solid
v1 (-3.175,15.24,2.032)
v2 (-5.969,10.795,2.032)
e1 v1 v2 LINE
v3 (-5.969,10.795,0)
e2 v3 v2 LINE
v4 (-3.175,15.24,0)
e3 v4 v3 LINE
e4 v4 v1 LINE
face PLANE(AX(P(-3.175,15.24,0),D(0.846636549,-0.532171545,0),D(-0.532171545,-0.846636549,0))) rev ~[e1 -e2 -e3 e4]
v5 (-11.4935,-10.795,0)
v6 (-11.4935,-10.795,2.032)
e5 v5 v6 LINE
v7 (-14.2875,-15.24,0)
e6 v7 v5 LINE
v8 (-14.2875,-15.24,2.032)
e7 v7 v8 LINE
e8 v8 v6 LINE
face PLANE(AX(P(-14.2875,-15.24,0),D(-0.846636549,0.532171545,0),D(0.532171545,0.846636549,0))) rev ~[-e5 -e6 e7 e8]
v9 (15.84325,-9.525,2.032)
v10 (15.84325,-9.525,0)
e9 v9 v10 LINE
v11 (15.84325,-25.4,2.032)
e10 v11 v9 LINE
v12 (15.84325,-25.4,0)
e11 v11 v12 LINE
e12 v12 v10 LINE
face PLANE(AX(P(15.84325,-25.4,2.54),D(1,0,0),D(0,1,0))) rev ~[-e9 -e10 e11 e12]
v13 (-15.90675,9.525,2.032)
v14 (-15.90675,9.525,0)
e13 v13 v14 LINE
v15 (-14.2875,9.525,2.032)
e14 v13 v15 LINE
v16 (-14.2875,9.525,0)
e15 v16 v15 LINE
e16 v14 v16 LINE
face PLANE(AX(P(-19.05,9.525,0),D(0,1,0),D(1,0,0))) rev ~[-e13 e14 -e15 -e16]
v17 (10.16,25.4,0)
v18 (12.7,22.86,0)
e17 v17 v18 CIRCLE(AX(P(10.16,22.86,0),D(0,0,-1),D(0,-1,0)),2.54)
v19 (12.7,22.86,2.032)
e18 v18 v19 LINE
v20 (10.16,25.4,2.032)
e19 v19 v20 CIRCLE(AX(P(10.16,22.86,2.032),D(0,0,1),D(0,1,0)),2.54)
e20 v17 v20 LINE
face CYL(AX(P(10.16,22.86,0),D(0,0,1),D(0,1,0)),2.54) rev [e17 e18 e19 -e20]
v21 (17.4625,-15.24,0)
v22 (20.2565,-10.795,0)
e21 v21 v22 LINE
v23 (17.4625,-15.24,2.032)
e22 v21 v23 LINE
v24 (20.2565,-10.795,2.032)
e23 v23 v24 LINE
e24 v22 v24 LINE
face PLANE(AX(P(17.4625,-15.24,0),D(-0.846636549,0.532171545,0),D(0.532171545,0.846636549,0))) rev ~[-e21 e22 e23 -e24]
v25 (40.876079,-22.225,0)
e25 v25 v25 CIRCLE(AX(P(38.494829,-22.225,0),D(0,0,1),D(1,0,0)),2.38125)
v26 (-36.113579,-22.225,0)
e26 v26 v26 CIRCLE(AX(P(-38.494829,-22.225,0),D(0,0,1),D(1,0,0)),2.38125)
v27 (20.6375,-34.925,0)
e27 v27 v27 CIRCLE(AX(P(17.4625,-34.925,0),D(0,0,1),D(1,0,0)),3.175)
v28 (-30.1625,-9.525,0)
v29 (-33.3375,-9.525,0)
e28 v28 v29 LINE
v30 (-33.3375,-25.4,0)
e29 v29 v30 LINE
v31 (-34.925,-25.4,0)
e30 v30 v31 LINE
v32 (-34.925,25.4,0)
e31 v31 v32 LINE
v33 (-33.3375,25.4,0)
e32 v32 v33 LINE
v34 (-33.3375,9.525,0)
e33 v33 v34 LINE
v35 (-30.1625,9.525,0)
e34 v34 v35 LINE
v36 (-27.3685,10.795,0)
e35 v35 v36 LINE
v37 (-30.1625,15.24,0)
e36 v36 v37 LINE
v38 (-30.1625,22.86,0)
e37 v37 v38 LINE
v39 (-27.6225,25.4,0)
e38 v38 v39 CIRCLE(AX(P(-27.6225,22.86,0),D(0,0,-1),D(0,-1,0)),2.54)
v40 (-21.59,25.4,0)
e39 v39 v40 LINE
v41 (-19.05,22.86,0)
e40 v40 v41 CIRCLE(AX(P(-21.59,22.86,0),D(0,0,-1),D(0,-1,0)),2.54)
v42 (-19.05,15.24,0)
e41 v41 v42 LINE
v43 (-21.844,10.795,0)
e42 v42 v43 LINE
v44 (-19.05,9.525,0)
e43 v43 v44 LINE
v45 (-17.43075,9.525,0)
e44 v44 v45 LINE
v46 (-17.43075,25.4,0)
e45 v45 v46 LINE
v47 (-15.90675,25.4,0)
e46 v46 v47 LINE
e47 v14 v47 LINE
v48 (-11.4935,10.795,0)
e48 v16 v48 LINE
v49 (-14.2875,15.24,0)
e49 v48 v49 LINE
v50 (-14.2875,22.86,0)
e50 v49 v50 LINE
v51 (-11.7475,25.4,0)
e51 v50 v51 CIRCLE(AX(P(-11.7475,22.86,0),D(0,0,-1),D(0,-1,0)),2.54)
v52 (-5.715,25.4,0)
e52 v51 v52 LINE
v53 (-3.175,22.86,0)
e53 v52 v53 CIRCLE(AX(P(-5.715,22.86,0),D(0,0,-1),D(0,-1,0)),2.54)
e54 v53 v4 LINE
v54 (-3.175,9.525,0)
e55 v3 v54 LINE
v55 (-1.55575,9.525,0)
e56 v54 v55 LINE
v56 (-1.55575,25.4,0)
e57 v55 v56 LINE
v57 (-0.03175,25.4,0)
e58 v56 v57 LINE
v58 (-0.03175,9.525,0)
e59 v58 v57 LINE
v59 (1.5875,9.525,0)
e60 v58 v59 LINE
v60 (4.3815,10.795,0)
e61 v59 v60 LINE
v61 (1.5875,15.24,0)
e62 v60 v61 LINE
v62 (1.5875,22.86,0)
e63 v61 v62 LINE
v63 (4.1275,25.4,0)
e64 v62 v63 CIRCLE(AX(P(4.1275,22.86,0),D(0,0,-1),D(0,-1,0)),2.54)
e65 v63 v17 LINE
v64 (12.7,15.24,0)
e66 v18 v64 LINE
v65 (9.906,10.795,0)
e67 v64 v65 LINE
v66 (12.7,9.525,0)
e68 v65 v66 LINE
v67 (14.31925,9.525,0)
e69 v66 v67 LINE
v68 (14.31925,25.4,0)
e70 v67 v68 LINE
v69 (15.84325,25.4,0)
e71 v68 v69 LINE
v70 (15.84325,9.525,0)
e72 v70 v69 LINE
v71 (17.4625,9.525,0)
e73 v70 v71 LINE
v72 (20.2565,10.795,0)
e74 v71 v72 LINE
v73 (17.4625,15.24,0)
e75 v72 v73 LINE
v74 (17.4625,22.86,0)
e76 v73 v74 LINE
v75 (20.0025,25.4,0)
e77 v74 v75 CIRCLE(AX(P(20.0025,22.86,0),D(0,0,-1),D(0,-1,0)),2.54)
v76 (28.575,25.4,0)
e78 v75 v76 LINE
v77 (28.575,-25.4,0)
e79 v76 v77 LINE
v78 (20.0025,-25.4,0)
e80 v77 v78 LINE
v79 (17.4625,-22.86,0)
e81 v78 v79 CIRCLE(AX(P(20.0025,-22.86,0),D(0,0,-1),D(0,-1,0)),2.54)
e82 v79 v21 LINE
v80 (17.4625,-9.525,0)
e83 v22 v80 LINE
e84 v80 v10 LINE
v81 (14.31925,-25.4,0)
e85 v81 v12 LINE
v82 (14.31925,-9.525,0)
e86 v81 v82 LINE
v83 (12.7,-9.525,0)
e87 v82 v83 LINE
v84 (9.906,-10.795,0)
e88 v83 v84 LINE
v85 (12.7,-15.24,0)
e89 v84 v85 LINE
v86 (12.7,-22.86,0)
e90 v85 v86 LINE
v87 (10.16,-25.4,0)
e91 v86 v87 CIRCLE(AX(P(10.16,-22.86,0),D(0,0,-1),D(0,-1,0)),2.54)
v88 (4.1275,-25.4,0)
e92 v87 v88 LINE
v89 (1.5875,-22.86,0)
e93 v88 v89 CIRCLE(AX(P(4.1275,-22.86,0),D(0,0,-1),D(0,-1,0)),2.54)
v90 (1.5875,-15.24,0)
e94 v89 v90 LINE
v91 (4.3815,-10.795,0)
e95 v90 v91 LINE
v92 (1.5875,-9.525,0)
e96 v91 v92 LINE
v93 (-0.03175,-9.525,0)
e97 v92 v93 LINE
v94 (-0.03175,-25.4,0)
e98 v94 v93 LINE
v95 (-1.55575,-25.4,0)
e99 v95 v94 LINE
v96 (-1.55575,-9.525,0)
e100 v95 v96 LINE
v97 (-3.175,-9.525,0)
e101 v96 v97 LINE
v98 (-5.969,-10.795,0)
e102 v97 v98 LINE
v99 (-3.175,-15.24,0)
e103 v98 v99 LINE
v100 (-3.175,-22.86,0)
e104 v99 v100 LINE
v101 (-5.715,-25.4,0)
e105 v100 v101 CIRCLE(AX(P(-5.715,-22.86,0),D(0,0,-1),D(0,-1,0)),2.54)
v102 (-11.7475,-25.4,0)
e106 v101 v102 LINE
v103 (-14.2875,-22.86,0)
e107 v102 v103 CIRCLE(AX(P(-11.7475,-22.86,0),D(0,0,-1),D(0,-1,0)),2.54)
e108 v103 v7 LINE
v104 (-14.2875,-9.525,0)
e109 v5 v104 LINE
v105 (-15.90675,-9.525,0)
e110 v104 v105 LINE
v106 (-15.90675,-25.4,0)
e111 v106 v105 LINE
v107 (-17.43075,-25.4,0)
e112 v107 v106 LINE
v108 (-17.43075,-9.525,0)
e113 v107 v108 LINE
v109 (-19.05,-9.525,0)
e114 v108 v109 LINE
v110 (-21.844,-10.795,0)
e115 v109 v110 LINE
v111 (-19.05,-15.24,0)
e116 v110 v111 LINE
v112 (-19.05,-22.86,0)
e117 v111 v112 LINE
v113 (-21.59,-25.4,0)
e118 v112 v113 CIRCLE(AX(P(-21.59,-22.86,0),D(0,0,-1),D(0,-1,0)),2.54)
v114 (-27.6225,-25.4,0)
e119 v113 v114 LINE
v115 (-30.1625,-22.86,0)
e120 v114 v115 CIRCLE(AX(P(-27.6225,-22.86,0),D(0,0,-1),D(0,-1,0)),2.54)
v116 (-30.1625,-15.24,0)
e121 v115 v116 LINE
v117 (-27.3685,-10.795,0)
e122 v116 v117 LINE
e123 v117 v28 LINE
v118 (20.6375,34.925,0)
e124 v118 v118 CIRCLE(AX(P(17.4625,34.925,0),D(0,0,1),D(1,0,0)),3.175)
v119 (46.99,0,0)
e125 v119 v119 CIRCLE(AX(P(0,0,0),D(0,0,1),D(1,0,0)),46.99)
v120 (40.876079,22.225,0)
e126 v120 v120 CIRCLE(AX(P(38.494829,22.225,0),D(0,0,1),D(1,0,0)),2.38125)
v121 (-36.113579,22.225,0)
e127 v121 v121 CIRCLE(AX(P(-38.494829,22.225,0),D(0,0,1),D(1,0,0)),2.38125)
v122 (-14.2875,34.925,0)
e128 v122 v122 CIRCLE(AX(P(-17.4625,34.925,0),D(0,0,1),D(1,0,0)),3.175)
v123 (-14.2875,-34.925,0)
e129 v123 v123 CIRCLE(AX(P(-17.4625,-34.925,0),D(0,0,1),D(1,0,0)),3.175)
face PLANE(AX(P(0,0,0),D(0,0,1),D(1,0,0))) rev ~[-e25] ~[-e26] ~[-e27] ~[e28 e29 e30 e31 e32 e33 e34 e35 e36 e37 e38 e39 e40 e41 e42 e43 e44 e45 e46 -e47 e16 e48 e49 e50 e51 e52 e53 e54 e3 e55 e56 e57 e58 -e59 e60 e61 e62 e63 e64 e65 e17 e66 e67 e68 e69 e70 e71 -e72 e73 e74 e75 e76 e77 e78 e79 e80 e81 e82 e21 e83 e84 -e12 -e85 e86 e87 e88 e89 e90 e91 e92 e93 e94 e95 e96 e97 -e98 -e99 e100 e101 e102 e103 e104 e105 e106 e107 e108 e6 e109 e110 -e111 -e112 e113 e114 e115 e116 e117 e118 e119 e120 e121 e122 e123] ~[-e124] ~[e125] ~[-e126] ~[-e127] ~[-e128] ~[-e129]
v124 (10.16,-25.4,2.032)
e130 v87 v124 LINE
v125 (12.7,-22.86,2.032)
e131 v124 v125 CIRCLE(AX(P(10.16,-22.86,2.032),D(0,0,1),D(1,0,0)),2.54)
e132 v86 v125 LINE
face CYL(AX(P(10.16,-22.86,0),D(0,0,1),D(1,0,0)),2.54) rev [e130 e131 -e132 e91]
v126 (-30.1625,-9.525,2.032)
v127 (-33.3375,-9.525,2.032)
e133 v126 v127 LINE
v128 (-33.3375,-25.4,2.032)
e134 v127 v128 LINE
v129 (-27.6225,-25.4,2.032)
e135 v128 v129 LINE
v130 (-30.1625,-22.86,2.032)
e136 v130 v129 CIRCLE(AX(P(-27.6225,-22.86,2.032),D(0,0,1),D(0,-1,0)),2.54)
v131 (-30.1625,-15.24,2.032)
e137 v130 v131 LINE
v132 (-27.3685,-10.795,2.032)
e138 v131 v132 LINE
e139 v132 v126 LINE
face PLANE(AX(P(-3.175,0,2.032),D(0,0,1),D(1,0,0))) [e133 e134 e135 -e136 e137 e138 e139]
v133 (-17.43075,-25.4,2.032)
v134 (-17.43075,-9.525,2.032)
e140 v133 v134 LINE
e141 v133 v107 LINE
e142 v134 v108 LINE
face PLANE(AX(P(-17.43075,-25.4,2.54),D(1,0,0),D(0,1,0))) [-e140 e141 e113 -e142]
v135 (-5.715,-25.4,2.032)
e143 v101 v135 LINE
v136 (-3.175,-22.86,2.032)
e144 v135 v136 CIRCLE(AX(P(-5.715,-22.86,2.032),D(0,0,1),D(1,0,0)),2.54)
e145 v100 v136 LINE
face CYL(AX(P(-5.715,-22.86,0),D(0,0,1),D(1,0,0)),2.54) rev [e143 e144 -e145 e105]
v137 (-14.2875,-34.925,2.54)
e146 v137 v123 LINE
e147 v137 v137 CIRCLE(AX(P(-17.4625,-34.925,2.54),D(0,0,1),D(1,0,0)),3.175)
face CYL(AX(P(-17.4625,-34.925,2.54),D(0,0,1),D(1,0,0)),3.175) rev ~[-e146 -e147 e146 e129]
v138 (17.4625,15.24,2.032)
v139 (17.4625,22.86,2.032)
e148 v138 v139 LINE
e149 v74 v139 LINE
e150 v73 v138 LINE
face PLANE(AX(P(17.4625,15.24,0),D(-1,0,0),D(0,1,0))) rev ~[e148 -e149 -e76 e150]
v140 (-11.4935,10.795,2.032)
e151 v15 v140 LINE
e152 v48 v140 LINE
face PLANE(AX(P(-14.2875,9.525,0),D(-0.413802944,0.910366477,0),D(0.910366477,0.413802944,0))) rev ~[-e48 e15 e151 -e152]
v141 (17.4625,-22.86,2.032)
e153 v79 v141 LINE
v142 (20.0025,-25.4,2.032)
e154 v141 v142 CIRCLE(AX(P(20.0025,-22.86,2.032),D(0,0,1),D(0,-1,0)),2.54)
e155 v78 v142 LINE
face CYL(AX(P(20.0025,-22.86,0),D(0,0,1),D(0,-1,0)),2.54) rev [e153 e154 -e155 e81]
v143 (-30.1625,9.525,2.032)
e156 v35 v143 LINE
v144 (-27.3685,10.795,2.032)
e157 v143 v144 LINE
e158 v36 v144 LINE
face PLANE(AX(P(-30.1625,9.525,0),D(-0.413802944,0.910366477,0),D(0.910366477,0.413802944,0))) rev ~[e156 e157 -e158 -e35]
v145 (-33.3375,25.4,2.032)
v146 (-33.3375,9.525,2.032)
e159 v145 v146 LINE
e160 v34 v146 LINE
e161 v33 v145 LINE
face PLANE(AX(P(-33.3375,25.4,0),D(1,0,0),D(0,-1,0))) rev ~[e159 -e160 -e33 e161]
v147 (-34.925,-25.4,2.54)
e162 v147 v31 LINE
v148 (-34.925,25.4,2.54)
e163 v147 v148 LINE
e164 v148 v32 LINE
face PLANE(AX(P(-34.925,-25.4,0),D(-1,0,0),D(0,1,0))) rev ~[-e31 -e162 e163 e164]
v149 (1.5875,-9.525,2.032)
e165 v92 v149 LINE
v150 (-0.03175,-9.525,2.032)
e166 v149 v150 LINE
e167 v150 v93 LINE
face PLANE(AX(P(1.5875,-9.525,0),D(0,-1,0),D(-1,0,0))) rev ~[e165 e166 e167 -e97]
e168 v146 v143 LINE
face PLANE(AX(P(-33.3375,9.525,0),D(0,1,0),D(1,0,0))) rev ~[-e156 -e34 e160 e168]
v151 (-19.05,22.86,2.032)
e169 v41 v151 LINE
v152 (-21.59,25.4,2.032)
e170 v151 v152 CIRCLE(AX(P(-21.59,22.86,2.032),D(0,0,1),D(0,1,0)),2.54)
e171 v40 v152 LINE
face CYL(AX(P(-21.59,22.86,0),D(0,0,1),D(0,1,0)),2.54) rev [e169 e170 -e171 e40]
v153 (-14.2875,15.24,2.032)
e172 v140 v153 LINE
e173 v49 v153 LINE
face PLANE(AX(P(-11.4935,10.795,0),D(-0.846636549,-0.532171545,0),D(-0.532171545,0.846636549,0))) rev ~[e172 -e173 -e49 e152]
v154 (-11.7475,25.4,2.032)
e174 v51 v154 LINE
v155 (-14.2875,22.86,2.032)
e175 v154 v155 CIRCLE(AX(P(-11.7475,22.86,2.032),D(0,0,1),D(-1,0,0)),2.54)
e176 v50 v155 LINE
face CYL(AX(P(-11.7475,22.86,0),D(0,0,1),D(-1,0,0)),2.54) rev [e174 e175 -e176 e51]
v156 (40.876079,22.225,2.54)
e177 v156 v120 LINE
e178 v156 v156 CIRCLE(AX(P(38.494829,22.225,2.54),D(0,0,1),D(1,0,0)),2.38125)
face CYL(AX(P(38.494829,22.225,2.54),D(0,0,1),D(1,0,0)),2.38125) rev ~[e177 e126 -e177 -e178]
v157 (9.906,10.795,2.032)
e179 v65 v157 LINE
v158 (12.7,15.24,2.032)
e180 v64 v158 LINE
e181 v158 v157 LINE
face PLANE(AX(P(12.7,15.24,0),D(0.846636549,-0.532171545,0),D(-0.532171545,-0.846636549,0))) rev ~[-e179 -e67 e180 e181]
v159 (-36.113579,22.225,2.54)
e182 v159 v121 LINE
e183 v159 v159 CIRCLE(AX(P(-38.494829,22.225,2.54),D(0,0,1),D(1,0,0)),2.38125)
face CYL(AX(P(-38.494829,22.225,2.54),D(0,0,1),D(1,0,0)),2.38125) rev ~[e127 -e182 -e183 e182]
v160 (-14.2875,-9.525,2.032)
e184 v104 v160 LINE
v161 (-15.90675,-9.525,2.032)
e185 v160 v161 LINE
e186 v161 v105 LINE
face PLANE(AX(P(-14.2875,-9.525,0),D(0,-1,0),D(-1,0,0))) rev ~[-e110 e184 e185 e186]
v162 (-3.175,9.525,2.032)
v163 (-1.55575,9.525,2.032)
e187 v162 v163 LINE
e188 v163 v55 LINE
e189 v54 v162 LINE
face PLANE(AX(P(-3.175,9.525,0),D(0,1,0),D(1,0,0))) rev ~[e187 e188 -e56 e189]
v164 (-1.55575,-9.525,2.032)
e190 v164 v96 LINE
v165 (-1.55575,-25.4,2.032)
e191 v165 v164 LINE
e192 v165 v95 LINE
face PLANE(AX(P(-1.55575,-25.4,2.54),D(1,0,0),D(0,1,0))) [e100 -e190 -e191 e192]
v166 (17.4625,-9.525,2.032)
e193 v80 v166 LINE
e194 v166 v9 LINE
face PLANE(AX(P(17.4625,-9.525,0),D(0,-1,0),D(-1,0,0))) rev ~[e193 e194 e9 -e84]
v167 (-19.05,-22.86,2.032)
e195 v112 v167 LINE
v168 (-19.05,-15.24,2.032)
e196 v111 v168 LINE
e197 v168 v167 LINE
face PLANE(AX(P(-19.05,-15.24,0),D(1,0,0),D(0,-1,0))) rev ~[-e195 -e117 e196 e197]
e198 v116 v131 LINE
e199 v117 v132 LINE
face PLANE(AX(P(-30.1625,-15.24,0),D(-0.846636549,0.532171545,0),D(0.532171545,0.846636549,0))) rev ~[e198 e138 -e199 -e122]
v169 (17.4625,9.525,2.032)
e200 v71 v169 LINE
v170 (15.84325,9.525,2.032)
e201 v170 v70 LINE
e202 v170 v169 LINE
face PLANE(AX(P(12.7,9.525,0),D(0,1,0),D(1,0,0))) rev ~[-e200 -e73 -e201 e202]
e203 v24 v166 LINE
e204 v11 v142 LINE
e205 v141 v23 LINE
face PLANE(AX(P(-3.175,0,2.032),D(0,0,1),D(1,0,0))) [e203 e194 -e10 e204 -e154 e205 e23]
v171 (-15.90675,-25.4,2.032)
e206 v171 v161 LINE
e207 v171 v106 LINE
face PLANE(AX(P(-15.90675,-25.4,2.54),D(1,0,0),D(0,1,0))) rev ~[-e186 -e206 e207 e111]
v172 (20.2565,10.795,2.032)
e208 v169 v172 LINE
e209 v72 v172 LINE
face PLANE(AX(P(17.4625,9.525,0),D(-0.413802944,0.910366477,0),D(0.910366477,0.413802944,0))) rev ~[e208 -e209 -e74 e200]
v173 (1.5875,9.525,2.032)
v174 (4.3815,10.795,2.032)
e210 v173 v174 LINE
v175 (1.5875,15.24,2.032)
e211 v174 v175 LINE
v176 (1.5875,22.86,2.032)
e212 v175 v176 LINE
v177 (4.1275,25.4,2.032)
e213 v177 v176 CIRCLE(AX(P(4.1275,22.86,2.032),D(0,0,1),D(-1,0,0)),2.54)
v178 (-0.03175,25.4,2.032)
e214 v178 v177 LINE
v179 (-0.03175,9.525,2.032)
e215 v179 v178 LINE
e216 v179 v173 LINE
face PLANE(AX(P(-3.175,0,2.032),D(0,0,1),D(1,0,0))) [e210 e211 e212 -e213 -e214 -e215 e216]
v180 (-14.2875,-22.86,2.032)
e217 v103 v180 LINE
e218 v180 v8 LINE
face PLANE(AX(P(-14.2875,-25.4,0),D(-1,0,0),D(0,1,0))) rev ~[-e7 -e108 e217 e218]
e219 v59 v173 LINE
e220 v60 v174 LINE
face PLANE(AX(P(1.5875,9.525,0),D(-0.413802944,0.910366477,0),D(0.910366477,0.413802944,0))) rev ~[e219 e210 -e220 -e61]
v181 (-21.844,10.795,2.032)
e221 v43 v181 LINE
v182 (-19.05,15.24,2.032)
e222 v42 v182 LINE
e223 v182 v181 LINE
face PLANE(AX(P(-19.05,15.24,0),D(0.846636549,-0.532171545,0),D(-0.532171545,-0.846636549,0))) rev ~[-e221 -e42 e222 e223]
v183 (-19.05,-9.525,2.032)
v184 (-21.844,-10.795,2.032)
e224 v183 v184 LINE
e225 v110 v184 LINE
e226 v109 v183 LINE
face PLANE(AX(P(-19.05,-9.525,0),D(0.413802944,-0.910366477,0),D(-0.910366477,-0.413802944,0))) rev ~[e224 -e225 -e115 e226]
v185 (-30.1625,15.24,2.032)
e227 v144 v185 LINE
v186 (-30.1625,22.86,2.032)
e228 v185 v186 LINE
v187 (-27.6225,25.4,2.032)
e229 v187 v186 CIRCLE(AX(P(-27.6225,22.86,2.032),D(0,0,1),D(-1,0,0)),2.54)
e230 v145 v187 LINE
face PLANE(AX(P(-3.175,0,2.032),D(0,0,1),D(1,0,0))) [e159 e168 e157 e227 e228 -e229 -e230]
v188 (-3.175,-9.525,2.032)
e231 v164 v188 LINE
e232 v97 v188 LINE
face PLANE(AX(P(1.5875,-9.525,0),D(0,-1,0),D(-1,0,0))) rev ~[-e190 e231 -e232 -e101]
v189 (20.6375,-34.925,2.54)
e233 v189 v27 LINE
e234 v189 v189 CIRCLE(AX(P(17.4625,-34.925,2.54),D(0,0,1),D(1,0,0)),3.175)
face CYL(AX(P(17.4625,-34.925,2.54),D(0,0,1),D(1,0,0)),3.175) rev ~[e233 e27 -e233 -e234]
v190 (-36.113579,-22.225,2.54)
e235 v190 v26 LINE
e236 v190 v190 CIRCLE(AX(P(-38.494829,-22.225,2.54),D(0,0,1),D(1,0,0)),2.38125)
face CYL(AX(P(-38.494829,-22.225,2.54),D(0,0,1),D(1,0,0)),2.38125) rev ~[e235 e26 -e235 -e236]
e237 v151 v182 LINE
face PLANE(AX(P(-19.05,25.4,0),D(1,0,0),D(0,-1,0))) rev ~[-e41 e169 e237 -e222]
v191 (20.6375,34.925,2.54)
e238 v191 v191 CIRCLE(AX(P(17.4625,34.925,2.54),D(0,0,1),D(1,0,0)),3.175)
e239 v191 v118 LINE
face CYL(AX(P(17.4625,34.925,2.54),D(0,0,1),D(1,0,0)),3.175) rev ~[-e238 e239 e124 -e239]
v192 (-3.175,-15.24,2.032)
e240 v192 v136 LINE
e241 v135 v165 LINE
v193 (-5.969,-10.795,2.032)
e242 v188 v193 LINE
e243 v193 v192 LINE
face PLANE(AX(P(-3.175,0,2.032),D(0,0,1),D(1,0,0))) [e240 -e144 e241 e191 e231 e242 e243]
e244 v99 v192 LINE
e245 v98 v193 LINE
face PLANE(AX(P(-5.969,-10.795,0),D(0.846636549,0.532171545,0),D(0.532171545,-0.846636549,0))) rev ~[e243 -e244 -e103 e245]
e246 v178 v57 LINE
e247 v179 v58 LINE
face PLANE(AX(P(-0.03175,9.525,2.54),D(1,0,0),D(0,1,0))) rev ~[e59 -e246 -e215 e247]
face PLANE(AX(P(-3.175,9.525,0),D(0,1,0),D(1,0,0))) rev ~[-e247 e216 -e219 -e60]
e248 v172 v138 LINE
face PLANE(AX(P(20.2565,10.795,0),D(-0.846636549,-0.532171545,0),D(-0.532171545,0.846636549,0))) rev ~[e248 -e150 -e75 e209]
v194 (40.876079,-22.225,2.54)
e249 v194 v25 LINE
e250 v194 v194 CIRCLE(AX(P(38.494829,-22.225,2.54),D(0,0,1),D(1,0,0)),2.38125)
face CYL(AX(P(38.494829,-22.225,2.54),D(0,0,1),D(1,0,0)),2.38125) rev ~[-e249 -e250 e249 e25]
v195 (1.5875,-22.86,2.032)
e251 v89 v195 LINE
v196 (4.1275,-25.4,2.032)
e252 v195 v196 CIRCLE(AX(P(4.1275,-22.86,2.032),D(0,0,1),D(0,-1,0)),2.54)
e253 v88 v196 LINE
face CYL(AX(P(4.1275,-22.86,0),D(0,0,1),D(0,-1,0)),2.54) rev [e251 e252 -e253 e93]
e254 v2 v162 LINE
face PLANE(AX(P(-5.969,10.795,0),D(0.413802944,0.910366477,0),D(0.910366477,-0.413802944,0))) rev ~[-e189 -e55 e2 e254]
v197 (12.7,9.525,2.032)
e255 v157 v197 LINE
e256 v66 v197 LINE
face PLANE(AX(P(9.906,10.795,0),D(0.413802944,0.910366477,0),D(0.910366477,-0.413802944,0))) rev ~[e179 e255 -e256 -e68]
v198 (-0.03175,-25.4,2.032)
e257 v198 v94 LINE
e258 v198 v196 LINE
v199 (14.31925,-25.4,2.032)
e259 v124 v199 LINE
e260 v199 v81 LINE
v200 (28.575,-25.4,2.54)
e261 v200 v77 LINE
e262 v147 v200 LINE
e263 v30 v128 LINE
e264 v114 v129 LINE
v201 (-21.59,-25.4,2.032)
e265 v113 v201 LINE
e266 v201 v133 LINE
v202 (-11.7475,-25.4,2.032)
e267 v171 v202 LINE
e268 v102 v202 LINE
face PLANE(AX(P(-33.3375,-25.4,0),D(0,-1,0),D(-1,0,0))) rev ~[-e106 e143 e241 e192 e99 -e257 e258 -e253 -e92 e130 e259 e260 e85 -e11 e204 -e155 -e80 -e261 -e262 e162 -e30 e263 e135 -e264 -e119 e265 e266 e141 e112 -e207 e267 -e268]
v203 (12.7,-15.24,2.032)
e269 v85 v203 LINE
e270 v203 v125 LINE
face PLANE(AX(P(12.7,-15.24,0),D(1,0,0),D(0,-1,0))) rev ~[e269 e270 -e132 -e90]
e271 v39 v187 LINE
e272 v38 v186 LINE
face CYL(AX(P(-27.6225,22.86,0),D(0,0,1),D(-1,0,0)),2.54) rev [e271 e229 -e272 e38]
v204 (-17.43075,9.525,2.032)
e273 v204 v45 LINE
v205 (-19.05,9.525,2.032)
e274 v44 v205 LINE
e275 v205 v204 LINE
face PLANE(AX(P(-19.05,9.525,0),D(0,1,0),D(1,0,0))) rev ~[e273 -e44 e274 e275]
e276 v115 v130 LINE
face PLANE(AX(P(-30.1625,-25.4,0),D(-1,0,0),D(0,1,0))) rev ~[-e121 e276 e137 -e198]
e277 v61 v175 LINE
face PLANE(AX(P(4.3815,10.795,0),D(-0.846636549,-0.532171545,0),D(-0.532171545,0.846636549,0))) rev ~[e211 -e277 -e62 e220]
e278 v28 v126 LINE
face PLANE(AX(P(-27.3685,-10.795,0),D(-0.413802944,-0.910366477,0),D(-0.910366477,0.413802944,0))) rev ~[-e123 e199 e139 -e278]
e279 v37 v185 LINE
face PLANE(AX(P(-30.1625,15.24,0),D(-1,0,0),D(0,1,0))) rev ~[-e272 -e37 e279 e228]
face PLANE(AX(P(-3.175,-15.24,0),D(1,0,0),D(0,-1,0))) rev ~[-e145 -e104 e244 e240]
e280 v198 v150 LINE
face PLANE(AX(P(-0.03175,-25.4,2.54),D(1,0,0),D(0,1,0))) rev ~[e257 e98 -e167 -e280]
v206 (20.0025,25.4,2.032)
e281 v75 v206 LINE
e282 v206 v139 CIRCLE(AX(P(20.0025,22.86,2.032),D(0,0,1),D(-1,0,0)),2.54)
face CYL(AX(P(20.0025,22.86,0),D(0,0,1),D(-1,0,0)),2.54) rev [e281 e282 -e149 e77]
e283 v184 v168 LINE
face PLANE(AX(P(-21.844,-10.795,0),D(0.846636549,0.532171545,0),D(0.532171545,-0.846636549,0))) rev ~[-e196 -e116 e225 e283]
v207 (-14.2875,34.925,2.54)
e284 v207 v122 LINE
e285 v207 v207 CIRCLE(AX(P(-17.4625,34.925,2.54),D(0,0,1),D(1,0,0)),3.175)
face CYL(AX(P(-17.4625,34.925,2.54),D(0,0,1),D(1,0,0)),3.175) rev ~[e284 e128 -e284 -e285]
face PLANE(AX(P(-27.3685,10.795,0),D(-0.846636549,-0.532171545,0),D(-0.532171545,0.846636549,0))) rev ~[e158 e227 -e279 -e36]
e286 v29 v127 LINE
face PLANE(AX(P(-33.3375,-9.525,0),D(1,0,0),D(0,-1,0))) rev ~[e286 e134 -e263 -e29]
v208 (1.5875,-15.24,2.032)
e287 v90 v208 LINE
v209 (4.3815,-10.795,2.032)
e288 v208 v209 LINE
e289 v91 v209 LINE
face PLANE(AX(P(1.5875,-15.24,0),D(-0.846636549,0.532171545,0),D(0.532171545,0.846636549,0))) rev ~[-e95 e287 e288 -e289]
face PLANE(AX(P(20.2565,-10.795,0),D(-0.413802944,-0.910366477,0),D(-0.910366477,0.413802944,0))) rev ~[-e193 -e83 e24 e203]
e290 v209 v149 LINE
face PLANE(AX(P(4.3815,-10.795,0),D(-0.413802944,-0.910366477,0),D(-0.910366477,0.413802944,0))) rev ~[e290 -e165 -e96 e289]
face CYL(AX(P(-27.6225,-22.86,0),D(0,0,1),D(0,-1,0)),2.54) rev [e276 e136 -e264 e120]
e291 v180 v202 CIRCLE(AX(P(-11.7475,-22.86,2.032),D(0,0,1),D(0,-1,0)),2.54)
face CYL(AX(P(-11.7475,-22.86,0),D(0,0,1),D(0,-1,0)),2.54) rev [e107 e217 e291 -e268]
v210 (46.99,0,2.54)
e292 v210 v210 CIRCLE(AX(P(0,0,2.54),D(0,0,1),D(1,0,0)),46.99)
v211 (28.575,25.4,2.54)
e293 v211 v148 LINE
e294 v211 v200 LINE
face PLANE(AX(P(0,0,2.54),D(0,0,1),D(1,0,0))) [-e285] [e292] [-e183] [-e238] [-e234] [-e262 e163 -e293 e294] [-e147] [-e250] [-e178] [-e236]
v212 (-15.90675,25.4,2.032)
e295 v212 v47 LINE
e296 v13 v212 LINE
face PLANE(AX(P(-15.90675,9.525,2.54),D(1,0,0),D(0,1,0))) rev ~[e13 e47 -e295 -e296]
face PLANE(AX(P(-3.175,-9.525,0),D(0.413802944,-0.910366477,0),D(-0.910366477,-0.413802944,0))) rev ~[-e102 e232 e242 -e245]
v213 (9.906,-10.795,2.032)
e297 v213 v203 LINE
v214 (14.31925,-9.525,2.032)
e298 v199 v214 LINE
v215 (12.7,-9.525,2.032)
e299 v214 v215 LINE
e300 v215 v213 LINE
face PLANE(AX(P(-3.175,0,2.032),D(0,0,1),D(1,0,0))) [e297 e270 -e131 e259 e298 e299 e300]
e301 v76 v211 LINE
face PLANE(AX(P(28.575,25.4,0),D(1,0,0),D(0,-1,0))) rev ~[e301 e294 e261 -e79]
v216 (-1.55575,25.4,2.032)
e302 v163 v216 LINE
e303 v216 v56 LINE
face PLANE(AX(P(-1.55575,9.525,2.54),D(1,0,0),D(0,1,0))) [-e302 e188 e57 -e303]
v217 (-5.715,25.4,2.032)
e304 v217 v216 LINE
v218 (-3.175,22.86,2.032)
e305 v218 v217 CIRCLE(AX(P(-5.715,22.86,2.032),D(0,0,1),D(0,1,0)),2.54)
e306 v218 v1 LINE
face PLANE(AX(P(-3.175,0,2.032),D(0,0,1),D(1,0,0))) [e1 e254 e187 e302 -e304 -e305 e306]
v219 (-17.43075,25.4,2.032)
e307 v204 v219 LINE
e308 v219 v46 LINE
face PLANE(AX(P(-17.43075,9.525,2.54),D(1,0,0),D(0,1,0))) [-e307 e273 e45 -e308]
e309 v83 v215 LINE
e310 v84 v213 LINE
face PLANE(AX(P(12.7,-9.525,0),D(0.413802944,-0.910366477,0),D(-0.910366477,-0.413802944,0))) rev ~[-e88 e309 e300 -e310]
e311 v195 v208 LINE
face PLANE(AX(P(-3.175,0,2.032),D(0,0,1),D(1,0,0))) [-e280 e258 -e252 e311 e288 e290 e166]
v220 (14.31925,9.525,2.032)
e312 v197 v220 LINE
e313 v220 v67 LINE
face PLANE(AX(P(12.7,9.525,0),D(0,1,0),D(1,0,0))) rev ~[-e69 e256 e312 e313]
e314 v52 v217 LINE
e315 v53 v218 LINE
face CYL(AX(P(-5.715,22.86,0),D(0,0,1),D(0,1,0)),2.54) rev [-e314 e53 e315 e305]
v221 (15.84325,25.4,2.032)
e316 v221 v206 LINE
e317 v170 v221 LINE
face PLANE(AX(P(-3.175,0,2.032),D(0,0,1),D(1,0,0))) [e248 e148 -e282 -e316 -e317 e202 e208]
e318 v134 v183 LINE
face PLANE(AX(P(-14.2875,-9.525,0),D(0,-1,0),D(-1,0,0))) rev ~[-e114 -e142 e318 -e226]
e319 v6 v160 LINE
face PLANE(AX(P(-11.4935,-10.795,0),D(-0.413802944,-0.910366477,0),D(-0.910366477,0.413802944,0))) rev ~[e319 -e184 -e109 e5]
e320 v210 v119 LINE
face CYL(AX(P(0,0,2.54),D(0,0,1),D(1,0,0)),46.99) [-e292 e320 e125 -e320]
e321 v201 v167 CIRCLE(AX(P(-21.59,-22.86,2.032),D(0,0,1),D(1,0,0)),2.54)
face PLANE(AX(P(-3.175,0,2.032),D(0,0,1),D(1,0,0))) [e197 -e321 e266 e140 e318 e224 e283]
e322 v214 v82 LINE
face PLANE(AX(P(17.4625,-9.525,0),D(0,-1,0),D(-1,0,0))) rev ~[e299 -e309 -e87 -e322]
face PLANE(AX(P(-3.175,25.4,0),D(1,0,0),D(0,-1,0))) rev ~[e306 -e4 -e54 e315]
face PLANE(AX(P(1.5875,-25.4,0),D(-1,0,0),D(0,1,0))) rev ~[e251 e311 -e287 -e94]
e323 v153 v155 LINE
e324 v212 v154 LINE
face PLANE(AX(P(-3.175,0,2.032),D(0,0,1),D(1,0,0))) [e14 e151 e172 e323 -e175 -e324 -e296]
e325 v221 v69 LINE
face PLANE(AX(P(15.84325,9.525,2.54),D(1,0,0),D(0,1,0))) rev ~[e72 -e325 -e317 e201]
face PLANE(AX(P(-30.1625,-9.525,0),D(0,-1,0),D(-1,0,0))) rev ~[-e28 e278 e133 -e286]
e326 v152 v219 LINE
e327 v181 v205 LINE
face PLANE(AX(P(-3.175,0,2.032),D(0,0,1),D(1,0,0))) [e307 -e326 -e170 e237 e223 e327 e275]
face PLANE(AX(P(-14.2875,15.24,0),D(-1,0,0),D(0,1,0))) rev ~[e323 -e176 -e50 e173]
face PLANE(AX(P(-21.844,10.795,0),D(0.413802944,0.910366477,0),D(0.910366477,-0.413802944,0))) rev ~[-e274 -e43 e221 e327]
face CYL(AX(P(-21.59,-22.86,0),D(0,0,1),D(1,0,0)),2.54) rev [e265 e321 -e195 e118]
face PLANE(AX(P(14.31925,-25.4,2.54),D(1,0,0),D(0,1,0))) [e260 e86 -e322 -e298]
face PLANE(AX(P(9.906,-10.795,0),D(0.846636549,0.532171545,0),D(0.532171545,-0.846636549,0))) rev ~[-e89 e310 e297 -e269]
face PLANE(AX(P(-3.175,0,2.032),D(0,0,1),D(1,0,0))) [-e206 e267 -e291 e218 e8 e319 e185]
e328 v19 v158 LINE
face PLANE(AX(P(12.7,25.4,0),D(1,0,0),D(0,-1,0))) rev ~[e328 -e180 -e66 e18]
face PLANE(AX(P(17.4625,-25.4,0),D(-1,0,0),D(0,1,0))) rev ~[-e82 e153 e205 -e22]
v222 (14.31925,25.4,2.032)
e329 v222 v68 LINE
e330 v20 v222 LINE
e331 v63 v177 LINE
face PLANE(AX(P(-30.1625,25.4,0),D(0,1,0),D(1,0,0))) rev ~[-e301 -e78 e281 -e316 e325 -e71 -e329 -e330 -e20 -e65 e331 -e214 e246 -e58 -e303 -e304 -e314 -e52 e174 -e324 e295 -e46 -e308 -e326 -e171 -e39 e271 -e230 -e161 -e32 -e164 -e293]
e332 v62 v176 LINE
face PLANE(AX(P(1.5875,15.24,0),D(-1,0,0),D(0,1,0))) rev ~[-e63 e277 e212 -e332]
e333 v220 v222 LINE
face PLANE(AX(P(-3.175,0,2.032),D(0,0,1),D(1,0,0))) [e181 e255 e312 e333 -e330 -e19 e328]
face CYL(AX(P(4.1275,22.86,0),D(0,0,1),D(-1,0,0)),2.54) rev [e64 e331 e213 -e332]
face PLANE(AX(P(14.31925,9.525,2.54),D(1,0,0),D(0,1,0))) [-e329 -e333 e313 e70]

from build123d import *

# Parameters (mm, degrees)
F0_R     = 52.3875
F1_DEPTH = 2.54
F2_R     = 2.54
F3_W     = 63.5
F3_H     = 50.8
F4_DEPTH = 0.508
F5_R     = 52.3875
F5_R_2   = 46.99
F5_R_3   = 2.38125
F5_R_4   = 3.175
F6_DEPTH = 25.4
F7_W     = 1.524
F7_H     = 15.875
F8_DEPTH = 25.4


# Not quite as in the source:
# - a feature names something its author has since deleted; it is built from what else it names


with BuildPart() as f1:
    # F0 (on Top) → F1 (new body)
    with BuildSketch(Plane.XY):
        Circle(F0_R)
        Polygon((-34.925, 25.4), (-33.3375, 25.4), (-30.1625, 25.4), (-19.05, 25.4), (-19.05, 15.24), (-21.844, 10.795), (-19.05, 9.525), (-17.4625, 9.525), (-14.2875, 9.525), (-11.4935, 10.795), (-14.2875, 15.24), (-14.2875, 25.4), (-3.175, 25.4), (-3.175, 15.24), (-5.969, 10.795), (-3.175, 9.525), (-1.5875, 9.525), (1.5875, 9.525), (4.3815, 10.795), (1.5875, 15.24), (1.5875, 25.4), (12.7, 25.4), (12.7, 15.24), (9.906, 10.795), (12.7, 9.525), (14.2875, 9.525), (17.4625, 9.525), (20.2565, 10.795), (17.4625, 15.24), (17.4625, 25.4), (28.575, 25.4), (28.575, -25.4), (17.4625, -25.4), (17.4625, -15.24), (20.2565, -10.795), (17.4625, -9.525), (14.2875, -9.525), (12.7, -9.525), (9.906, -10.795), (12.7, -15.24), (12.7, -25.4), (1.5875, -25.4), (1.5875, -15.24), (4.3815, -10.795), (1.5875, -9.525), (-1.5875, -9.525), (-3.175, -9.525), (-5.969, -10.795), (-3.175, -15.24), (-3.175, -25.4), (-14.2875, -25.4), (-14.2875, -15.24), (-11.4935, -10.795), (-14.2875, -9.525), (-17.4625, -9.525), (-19.05, -9.525), (-21.844, -10.795), (-19.05, -15.24), (-19.05, -25.4), (-30.1625, -25.4), (-33.3375, -25.4), (-34.925, -25.4), align=None, mode=Mode.SUBTRACT)
        Polygon((-33.3375, 9.525), (-30.1625, 9.525), (-27.3685, 10.795), (-30.1625, 15.24), (-30.1625, 25.4), (-33.3375, 25.4), align=None)
        Polygon((-33.3375, -9.525), (-33.3375, -25.4), (-30.1625, -25.4), (-30.1625, -15.24), (-27.3685, -10.795), (-30.1625, -9.525), align=None)
    extrude(amount=F1_DEPTH)

    # F2
    f2_edges = [f1.edges().sort_by_distance(p)[0] for p in [
        (-30.1625, 25.4, 1.27),
        (-14.2875, 25.4, 1.27),
        (1.5875, 25.4, 1.27),
        (17.4625, 25.4, 1.27),
        (17.4625, -25.4, 1.27),
        (1.5875, -25.4, 1.27),
        (-14.2875, -25.4, 1.27),
        (-30.1625, -25.4, 1.27),
        (-19.05, -25.4, 1.27),
        (-3.175, -25.4, 1.27),
        (12.7, -25.4, 1.27),
        (12.7, 25.4, 1.27),
        (-3.175, 25.4, 1.27),
        (-19.05, 25.4, 1.27),
    ]]
    fillet(f2_edges, radius=F2_R)

    # F3 (on face) → F4 (cut)
    with BuildSketch(Plane.XY.offset(2.54)):
        with Locations((-3.175, 0)):
            Rectangle(F3_W, F3_H)
    extrude(amount=-F4_DEPTH, mode=Mode.SUBTRACT)

    # F5 (on face) → F6 (cut)
    with BuildSketch(Plane.XY.offset(2.54)):
        Circle(F5_R)
        Circle(F5_R_2, mode=Mode.SUBTRACT)
        with Locations((-38.4948291982, 22.225)):
            Circle(F5_R_3)
        with Locations((-38.4948291982, -22.225)):
            Circle(F5_R_3)
        with Locations((38.4948291982, -22.225)):
            Circle(F5_R_3)
        with Locations((38.4948291982, 22.225)):
            Circle(F5_R_3)
        with Locations((17.4625, -34.925)):
            Circle(F5_R_4)
        with Locations((17.4625, 34.925)):
            Circle(F5_R_4)
        with Locations((-17.4625, 34.925)):
            Circle(F5_R_4)
        with Locations((-17.4625, -34.925)):
            Circle(F5_R_4)
    extrude(amount=-F6_DEPTH, mode=Mode.SUBTRACT)

    # F7 (on face) → F8 (cut)
    with BuildSketch(Plane.XY.offset(2.54)):
        with Locations((-16.66875, 17.4625)):
            Rectangle(F7_W, F7_H)
        with Locations((-0.79375, 17.4625)):
            Rectangle(F7_W, F7_H)
        with Locations((15.08125, 17.4625)):
            Rectangle(F7_W, F7_H)
        with Locations((-16.66875, -17.4625)):
            Rectangle(F7_W, F7_H)
        with Locations((-0.79375, -17.4625)):
            Rectangle(F7_W, F7_H)
        with Locations((15.08125, -17.4625)):
            Rectangle(F7_W, F7_H)
    extrude(amount=-F8_DEPTH, mode=Mode.SUBTRACT)


solid = f1.part
